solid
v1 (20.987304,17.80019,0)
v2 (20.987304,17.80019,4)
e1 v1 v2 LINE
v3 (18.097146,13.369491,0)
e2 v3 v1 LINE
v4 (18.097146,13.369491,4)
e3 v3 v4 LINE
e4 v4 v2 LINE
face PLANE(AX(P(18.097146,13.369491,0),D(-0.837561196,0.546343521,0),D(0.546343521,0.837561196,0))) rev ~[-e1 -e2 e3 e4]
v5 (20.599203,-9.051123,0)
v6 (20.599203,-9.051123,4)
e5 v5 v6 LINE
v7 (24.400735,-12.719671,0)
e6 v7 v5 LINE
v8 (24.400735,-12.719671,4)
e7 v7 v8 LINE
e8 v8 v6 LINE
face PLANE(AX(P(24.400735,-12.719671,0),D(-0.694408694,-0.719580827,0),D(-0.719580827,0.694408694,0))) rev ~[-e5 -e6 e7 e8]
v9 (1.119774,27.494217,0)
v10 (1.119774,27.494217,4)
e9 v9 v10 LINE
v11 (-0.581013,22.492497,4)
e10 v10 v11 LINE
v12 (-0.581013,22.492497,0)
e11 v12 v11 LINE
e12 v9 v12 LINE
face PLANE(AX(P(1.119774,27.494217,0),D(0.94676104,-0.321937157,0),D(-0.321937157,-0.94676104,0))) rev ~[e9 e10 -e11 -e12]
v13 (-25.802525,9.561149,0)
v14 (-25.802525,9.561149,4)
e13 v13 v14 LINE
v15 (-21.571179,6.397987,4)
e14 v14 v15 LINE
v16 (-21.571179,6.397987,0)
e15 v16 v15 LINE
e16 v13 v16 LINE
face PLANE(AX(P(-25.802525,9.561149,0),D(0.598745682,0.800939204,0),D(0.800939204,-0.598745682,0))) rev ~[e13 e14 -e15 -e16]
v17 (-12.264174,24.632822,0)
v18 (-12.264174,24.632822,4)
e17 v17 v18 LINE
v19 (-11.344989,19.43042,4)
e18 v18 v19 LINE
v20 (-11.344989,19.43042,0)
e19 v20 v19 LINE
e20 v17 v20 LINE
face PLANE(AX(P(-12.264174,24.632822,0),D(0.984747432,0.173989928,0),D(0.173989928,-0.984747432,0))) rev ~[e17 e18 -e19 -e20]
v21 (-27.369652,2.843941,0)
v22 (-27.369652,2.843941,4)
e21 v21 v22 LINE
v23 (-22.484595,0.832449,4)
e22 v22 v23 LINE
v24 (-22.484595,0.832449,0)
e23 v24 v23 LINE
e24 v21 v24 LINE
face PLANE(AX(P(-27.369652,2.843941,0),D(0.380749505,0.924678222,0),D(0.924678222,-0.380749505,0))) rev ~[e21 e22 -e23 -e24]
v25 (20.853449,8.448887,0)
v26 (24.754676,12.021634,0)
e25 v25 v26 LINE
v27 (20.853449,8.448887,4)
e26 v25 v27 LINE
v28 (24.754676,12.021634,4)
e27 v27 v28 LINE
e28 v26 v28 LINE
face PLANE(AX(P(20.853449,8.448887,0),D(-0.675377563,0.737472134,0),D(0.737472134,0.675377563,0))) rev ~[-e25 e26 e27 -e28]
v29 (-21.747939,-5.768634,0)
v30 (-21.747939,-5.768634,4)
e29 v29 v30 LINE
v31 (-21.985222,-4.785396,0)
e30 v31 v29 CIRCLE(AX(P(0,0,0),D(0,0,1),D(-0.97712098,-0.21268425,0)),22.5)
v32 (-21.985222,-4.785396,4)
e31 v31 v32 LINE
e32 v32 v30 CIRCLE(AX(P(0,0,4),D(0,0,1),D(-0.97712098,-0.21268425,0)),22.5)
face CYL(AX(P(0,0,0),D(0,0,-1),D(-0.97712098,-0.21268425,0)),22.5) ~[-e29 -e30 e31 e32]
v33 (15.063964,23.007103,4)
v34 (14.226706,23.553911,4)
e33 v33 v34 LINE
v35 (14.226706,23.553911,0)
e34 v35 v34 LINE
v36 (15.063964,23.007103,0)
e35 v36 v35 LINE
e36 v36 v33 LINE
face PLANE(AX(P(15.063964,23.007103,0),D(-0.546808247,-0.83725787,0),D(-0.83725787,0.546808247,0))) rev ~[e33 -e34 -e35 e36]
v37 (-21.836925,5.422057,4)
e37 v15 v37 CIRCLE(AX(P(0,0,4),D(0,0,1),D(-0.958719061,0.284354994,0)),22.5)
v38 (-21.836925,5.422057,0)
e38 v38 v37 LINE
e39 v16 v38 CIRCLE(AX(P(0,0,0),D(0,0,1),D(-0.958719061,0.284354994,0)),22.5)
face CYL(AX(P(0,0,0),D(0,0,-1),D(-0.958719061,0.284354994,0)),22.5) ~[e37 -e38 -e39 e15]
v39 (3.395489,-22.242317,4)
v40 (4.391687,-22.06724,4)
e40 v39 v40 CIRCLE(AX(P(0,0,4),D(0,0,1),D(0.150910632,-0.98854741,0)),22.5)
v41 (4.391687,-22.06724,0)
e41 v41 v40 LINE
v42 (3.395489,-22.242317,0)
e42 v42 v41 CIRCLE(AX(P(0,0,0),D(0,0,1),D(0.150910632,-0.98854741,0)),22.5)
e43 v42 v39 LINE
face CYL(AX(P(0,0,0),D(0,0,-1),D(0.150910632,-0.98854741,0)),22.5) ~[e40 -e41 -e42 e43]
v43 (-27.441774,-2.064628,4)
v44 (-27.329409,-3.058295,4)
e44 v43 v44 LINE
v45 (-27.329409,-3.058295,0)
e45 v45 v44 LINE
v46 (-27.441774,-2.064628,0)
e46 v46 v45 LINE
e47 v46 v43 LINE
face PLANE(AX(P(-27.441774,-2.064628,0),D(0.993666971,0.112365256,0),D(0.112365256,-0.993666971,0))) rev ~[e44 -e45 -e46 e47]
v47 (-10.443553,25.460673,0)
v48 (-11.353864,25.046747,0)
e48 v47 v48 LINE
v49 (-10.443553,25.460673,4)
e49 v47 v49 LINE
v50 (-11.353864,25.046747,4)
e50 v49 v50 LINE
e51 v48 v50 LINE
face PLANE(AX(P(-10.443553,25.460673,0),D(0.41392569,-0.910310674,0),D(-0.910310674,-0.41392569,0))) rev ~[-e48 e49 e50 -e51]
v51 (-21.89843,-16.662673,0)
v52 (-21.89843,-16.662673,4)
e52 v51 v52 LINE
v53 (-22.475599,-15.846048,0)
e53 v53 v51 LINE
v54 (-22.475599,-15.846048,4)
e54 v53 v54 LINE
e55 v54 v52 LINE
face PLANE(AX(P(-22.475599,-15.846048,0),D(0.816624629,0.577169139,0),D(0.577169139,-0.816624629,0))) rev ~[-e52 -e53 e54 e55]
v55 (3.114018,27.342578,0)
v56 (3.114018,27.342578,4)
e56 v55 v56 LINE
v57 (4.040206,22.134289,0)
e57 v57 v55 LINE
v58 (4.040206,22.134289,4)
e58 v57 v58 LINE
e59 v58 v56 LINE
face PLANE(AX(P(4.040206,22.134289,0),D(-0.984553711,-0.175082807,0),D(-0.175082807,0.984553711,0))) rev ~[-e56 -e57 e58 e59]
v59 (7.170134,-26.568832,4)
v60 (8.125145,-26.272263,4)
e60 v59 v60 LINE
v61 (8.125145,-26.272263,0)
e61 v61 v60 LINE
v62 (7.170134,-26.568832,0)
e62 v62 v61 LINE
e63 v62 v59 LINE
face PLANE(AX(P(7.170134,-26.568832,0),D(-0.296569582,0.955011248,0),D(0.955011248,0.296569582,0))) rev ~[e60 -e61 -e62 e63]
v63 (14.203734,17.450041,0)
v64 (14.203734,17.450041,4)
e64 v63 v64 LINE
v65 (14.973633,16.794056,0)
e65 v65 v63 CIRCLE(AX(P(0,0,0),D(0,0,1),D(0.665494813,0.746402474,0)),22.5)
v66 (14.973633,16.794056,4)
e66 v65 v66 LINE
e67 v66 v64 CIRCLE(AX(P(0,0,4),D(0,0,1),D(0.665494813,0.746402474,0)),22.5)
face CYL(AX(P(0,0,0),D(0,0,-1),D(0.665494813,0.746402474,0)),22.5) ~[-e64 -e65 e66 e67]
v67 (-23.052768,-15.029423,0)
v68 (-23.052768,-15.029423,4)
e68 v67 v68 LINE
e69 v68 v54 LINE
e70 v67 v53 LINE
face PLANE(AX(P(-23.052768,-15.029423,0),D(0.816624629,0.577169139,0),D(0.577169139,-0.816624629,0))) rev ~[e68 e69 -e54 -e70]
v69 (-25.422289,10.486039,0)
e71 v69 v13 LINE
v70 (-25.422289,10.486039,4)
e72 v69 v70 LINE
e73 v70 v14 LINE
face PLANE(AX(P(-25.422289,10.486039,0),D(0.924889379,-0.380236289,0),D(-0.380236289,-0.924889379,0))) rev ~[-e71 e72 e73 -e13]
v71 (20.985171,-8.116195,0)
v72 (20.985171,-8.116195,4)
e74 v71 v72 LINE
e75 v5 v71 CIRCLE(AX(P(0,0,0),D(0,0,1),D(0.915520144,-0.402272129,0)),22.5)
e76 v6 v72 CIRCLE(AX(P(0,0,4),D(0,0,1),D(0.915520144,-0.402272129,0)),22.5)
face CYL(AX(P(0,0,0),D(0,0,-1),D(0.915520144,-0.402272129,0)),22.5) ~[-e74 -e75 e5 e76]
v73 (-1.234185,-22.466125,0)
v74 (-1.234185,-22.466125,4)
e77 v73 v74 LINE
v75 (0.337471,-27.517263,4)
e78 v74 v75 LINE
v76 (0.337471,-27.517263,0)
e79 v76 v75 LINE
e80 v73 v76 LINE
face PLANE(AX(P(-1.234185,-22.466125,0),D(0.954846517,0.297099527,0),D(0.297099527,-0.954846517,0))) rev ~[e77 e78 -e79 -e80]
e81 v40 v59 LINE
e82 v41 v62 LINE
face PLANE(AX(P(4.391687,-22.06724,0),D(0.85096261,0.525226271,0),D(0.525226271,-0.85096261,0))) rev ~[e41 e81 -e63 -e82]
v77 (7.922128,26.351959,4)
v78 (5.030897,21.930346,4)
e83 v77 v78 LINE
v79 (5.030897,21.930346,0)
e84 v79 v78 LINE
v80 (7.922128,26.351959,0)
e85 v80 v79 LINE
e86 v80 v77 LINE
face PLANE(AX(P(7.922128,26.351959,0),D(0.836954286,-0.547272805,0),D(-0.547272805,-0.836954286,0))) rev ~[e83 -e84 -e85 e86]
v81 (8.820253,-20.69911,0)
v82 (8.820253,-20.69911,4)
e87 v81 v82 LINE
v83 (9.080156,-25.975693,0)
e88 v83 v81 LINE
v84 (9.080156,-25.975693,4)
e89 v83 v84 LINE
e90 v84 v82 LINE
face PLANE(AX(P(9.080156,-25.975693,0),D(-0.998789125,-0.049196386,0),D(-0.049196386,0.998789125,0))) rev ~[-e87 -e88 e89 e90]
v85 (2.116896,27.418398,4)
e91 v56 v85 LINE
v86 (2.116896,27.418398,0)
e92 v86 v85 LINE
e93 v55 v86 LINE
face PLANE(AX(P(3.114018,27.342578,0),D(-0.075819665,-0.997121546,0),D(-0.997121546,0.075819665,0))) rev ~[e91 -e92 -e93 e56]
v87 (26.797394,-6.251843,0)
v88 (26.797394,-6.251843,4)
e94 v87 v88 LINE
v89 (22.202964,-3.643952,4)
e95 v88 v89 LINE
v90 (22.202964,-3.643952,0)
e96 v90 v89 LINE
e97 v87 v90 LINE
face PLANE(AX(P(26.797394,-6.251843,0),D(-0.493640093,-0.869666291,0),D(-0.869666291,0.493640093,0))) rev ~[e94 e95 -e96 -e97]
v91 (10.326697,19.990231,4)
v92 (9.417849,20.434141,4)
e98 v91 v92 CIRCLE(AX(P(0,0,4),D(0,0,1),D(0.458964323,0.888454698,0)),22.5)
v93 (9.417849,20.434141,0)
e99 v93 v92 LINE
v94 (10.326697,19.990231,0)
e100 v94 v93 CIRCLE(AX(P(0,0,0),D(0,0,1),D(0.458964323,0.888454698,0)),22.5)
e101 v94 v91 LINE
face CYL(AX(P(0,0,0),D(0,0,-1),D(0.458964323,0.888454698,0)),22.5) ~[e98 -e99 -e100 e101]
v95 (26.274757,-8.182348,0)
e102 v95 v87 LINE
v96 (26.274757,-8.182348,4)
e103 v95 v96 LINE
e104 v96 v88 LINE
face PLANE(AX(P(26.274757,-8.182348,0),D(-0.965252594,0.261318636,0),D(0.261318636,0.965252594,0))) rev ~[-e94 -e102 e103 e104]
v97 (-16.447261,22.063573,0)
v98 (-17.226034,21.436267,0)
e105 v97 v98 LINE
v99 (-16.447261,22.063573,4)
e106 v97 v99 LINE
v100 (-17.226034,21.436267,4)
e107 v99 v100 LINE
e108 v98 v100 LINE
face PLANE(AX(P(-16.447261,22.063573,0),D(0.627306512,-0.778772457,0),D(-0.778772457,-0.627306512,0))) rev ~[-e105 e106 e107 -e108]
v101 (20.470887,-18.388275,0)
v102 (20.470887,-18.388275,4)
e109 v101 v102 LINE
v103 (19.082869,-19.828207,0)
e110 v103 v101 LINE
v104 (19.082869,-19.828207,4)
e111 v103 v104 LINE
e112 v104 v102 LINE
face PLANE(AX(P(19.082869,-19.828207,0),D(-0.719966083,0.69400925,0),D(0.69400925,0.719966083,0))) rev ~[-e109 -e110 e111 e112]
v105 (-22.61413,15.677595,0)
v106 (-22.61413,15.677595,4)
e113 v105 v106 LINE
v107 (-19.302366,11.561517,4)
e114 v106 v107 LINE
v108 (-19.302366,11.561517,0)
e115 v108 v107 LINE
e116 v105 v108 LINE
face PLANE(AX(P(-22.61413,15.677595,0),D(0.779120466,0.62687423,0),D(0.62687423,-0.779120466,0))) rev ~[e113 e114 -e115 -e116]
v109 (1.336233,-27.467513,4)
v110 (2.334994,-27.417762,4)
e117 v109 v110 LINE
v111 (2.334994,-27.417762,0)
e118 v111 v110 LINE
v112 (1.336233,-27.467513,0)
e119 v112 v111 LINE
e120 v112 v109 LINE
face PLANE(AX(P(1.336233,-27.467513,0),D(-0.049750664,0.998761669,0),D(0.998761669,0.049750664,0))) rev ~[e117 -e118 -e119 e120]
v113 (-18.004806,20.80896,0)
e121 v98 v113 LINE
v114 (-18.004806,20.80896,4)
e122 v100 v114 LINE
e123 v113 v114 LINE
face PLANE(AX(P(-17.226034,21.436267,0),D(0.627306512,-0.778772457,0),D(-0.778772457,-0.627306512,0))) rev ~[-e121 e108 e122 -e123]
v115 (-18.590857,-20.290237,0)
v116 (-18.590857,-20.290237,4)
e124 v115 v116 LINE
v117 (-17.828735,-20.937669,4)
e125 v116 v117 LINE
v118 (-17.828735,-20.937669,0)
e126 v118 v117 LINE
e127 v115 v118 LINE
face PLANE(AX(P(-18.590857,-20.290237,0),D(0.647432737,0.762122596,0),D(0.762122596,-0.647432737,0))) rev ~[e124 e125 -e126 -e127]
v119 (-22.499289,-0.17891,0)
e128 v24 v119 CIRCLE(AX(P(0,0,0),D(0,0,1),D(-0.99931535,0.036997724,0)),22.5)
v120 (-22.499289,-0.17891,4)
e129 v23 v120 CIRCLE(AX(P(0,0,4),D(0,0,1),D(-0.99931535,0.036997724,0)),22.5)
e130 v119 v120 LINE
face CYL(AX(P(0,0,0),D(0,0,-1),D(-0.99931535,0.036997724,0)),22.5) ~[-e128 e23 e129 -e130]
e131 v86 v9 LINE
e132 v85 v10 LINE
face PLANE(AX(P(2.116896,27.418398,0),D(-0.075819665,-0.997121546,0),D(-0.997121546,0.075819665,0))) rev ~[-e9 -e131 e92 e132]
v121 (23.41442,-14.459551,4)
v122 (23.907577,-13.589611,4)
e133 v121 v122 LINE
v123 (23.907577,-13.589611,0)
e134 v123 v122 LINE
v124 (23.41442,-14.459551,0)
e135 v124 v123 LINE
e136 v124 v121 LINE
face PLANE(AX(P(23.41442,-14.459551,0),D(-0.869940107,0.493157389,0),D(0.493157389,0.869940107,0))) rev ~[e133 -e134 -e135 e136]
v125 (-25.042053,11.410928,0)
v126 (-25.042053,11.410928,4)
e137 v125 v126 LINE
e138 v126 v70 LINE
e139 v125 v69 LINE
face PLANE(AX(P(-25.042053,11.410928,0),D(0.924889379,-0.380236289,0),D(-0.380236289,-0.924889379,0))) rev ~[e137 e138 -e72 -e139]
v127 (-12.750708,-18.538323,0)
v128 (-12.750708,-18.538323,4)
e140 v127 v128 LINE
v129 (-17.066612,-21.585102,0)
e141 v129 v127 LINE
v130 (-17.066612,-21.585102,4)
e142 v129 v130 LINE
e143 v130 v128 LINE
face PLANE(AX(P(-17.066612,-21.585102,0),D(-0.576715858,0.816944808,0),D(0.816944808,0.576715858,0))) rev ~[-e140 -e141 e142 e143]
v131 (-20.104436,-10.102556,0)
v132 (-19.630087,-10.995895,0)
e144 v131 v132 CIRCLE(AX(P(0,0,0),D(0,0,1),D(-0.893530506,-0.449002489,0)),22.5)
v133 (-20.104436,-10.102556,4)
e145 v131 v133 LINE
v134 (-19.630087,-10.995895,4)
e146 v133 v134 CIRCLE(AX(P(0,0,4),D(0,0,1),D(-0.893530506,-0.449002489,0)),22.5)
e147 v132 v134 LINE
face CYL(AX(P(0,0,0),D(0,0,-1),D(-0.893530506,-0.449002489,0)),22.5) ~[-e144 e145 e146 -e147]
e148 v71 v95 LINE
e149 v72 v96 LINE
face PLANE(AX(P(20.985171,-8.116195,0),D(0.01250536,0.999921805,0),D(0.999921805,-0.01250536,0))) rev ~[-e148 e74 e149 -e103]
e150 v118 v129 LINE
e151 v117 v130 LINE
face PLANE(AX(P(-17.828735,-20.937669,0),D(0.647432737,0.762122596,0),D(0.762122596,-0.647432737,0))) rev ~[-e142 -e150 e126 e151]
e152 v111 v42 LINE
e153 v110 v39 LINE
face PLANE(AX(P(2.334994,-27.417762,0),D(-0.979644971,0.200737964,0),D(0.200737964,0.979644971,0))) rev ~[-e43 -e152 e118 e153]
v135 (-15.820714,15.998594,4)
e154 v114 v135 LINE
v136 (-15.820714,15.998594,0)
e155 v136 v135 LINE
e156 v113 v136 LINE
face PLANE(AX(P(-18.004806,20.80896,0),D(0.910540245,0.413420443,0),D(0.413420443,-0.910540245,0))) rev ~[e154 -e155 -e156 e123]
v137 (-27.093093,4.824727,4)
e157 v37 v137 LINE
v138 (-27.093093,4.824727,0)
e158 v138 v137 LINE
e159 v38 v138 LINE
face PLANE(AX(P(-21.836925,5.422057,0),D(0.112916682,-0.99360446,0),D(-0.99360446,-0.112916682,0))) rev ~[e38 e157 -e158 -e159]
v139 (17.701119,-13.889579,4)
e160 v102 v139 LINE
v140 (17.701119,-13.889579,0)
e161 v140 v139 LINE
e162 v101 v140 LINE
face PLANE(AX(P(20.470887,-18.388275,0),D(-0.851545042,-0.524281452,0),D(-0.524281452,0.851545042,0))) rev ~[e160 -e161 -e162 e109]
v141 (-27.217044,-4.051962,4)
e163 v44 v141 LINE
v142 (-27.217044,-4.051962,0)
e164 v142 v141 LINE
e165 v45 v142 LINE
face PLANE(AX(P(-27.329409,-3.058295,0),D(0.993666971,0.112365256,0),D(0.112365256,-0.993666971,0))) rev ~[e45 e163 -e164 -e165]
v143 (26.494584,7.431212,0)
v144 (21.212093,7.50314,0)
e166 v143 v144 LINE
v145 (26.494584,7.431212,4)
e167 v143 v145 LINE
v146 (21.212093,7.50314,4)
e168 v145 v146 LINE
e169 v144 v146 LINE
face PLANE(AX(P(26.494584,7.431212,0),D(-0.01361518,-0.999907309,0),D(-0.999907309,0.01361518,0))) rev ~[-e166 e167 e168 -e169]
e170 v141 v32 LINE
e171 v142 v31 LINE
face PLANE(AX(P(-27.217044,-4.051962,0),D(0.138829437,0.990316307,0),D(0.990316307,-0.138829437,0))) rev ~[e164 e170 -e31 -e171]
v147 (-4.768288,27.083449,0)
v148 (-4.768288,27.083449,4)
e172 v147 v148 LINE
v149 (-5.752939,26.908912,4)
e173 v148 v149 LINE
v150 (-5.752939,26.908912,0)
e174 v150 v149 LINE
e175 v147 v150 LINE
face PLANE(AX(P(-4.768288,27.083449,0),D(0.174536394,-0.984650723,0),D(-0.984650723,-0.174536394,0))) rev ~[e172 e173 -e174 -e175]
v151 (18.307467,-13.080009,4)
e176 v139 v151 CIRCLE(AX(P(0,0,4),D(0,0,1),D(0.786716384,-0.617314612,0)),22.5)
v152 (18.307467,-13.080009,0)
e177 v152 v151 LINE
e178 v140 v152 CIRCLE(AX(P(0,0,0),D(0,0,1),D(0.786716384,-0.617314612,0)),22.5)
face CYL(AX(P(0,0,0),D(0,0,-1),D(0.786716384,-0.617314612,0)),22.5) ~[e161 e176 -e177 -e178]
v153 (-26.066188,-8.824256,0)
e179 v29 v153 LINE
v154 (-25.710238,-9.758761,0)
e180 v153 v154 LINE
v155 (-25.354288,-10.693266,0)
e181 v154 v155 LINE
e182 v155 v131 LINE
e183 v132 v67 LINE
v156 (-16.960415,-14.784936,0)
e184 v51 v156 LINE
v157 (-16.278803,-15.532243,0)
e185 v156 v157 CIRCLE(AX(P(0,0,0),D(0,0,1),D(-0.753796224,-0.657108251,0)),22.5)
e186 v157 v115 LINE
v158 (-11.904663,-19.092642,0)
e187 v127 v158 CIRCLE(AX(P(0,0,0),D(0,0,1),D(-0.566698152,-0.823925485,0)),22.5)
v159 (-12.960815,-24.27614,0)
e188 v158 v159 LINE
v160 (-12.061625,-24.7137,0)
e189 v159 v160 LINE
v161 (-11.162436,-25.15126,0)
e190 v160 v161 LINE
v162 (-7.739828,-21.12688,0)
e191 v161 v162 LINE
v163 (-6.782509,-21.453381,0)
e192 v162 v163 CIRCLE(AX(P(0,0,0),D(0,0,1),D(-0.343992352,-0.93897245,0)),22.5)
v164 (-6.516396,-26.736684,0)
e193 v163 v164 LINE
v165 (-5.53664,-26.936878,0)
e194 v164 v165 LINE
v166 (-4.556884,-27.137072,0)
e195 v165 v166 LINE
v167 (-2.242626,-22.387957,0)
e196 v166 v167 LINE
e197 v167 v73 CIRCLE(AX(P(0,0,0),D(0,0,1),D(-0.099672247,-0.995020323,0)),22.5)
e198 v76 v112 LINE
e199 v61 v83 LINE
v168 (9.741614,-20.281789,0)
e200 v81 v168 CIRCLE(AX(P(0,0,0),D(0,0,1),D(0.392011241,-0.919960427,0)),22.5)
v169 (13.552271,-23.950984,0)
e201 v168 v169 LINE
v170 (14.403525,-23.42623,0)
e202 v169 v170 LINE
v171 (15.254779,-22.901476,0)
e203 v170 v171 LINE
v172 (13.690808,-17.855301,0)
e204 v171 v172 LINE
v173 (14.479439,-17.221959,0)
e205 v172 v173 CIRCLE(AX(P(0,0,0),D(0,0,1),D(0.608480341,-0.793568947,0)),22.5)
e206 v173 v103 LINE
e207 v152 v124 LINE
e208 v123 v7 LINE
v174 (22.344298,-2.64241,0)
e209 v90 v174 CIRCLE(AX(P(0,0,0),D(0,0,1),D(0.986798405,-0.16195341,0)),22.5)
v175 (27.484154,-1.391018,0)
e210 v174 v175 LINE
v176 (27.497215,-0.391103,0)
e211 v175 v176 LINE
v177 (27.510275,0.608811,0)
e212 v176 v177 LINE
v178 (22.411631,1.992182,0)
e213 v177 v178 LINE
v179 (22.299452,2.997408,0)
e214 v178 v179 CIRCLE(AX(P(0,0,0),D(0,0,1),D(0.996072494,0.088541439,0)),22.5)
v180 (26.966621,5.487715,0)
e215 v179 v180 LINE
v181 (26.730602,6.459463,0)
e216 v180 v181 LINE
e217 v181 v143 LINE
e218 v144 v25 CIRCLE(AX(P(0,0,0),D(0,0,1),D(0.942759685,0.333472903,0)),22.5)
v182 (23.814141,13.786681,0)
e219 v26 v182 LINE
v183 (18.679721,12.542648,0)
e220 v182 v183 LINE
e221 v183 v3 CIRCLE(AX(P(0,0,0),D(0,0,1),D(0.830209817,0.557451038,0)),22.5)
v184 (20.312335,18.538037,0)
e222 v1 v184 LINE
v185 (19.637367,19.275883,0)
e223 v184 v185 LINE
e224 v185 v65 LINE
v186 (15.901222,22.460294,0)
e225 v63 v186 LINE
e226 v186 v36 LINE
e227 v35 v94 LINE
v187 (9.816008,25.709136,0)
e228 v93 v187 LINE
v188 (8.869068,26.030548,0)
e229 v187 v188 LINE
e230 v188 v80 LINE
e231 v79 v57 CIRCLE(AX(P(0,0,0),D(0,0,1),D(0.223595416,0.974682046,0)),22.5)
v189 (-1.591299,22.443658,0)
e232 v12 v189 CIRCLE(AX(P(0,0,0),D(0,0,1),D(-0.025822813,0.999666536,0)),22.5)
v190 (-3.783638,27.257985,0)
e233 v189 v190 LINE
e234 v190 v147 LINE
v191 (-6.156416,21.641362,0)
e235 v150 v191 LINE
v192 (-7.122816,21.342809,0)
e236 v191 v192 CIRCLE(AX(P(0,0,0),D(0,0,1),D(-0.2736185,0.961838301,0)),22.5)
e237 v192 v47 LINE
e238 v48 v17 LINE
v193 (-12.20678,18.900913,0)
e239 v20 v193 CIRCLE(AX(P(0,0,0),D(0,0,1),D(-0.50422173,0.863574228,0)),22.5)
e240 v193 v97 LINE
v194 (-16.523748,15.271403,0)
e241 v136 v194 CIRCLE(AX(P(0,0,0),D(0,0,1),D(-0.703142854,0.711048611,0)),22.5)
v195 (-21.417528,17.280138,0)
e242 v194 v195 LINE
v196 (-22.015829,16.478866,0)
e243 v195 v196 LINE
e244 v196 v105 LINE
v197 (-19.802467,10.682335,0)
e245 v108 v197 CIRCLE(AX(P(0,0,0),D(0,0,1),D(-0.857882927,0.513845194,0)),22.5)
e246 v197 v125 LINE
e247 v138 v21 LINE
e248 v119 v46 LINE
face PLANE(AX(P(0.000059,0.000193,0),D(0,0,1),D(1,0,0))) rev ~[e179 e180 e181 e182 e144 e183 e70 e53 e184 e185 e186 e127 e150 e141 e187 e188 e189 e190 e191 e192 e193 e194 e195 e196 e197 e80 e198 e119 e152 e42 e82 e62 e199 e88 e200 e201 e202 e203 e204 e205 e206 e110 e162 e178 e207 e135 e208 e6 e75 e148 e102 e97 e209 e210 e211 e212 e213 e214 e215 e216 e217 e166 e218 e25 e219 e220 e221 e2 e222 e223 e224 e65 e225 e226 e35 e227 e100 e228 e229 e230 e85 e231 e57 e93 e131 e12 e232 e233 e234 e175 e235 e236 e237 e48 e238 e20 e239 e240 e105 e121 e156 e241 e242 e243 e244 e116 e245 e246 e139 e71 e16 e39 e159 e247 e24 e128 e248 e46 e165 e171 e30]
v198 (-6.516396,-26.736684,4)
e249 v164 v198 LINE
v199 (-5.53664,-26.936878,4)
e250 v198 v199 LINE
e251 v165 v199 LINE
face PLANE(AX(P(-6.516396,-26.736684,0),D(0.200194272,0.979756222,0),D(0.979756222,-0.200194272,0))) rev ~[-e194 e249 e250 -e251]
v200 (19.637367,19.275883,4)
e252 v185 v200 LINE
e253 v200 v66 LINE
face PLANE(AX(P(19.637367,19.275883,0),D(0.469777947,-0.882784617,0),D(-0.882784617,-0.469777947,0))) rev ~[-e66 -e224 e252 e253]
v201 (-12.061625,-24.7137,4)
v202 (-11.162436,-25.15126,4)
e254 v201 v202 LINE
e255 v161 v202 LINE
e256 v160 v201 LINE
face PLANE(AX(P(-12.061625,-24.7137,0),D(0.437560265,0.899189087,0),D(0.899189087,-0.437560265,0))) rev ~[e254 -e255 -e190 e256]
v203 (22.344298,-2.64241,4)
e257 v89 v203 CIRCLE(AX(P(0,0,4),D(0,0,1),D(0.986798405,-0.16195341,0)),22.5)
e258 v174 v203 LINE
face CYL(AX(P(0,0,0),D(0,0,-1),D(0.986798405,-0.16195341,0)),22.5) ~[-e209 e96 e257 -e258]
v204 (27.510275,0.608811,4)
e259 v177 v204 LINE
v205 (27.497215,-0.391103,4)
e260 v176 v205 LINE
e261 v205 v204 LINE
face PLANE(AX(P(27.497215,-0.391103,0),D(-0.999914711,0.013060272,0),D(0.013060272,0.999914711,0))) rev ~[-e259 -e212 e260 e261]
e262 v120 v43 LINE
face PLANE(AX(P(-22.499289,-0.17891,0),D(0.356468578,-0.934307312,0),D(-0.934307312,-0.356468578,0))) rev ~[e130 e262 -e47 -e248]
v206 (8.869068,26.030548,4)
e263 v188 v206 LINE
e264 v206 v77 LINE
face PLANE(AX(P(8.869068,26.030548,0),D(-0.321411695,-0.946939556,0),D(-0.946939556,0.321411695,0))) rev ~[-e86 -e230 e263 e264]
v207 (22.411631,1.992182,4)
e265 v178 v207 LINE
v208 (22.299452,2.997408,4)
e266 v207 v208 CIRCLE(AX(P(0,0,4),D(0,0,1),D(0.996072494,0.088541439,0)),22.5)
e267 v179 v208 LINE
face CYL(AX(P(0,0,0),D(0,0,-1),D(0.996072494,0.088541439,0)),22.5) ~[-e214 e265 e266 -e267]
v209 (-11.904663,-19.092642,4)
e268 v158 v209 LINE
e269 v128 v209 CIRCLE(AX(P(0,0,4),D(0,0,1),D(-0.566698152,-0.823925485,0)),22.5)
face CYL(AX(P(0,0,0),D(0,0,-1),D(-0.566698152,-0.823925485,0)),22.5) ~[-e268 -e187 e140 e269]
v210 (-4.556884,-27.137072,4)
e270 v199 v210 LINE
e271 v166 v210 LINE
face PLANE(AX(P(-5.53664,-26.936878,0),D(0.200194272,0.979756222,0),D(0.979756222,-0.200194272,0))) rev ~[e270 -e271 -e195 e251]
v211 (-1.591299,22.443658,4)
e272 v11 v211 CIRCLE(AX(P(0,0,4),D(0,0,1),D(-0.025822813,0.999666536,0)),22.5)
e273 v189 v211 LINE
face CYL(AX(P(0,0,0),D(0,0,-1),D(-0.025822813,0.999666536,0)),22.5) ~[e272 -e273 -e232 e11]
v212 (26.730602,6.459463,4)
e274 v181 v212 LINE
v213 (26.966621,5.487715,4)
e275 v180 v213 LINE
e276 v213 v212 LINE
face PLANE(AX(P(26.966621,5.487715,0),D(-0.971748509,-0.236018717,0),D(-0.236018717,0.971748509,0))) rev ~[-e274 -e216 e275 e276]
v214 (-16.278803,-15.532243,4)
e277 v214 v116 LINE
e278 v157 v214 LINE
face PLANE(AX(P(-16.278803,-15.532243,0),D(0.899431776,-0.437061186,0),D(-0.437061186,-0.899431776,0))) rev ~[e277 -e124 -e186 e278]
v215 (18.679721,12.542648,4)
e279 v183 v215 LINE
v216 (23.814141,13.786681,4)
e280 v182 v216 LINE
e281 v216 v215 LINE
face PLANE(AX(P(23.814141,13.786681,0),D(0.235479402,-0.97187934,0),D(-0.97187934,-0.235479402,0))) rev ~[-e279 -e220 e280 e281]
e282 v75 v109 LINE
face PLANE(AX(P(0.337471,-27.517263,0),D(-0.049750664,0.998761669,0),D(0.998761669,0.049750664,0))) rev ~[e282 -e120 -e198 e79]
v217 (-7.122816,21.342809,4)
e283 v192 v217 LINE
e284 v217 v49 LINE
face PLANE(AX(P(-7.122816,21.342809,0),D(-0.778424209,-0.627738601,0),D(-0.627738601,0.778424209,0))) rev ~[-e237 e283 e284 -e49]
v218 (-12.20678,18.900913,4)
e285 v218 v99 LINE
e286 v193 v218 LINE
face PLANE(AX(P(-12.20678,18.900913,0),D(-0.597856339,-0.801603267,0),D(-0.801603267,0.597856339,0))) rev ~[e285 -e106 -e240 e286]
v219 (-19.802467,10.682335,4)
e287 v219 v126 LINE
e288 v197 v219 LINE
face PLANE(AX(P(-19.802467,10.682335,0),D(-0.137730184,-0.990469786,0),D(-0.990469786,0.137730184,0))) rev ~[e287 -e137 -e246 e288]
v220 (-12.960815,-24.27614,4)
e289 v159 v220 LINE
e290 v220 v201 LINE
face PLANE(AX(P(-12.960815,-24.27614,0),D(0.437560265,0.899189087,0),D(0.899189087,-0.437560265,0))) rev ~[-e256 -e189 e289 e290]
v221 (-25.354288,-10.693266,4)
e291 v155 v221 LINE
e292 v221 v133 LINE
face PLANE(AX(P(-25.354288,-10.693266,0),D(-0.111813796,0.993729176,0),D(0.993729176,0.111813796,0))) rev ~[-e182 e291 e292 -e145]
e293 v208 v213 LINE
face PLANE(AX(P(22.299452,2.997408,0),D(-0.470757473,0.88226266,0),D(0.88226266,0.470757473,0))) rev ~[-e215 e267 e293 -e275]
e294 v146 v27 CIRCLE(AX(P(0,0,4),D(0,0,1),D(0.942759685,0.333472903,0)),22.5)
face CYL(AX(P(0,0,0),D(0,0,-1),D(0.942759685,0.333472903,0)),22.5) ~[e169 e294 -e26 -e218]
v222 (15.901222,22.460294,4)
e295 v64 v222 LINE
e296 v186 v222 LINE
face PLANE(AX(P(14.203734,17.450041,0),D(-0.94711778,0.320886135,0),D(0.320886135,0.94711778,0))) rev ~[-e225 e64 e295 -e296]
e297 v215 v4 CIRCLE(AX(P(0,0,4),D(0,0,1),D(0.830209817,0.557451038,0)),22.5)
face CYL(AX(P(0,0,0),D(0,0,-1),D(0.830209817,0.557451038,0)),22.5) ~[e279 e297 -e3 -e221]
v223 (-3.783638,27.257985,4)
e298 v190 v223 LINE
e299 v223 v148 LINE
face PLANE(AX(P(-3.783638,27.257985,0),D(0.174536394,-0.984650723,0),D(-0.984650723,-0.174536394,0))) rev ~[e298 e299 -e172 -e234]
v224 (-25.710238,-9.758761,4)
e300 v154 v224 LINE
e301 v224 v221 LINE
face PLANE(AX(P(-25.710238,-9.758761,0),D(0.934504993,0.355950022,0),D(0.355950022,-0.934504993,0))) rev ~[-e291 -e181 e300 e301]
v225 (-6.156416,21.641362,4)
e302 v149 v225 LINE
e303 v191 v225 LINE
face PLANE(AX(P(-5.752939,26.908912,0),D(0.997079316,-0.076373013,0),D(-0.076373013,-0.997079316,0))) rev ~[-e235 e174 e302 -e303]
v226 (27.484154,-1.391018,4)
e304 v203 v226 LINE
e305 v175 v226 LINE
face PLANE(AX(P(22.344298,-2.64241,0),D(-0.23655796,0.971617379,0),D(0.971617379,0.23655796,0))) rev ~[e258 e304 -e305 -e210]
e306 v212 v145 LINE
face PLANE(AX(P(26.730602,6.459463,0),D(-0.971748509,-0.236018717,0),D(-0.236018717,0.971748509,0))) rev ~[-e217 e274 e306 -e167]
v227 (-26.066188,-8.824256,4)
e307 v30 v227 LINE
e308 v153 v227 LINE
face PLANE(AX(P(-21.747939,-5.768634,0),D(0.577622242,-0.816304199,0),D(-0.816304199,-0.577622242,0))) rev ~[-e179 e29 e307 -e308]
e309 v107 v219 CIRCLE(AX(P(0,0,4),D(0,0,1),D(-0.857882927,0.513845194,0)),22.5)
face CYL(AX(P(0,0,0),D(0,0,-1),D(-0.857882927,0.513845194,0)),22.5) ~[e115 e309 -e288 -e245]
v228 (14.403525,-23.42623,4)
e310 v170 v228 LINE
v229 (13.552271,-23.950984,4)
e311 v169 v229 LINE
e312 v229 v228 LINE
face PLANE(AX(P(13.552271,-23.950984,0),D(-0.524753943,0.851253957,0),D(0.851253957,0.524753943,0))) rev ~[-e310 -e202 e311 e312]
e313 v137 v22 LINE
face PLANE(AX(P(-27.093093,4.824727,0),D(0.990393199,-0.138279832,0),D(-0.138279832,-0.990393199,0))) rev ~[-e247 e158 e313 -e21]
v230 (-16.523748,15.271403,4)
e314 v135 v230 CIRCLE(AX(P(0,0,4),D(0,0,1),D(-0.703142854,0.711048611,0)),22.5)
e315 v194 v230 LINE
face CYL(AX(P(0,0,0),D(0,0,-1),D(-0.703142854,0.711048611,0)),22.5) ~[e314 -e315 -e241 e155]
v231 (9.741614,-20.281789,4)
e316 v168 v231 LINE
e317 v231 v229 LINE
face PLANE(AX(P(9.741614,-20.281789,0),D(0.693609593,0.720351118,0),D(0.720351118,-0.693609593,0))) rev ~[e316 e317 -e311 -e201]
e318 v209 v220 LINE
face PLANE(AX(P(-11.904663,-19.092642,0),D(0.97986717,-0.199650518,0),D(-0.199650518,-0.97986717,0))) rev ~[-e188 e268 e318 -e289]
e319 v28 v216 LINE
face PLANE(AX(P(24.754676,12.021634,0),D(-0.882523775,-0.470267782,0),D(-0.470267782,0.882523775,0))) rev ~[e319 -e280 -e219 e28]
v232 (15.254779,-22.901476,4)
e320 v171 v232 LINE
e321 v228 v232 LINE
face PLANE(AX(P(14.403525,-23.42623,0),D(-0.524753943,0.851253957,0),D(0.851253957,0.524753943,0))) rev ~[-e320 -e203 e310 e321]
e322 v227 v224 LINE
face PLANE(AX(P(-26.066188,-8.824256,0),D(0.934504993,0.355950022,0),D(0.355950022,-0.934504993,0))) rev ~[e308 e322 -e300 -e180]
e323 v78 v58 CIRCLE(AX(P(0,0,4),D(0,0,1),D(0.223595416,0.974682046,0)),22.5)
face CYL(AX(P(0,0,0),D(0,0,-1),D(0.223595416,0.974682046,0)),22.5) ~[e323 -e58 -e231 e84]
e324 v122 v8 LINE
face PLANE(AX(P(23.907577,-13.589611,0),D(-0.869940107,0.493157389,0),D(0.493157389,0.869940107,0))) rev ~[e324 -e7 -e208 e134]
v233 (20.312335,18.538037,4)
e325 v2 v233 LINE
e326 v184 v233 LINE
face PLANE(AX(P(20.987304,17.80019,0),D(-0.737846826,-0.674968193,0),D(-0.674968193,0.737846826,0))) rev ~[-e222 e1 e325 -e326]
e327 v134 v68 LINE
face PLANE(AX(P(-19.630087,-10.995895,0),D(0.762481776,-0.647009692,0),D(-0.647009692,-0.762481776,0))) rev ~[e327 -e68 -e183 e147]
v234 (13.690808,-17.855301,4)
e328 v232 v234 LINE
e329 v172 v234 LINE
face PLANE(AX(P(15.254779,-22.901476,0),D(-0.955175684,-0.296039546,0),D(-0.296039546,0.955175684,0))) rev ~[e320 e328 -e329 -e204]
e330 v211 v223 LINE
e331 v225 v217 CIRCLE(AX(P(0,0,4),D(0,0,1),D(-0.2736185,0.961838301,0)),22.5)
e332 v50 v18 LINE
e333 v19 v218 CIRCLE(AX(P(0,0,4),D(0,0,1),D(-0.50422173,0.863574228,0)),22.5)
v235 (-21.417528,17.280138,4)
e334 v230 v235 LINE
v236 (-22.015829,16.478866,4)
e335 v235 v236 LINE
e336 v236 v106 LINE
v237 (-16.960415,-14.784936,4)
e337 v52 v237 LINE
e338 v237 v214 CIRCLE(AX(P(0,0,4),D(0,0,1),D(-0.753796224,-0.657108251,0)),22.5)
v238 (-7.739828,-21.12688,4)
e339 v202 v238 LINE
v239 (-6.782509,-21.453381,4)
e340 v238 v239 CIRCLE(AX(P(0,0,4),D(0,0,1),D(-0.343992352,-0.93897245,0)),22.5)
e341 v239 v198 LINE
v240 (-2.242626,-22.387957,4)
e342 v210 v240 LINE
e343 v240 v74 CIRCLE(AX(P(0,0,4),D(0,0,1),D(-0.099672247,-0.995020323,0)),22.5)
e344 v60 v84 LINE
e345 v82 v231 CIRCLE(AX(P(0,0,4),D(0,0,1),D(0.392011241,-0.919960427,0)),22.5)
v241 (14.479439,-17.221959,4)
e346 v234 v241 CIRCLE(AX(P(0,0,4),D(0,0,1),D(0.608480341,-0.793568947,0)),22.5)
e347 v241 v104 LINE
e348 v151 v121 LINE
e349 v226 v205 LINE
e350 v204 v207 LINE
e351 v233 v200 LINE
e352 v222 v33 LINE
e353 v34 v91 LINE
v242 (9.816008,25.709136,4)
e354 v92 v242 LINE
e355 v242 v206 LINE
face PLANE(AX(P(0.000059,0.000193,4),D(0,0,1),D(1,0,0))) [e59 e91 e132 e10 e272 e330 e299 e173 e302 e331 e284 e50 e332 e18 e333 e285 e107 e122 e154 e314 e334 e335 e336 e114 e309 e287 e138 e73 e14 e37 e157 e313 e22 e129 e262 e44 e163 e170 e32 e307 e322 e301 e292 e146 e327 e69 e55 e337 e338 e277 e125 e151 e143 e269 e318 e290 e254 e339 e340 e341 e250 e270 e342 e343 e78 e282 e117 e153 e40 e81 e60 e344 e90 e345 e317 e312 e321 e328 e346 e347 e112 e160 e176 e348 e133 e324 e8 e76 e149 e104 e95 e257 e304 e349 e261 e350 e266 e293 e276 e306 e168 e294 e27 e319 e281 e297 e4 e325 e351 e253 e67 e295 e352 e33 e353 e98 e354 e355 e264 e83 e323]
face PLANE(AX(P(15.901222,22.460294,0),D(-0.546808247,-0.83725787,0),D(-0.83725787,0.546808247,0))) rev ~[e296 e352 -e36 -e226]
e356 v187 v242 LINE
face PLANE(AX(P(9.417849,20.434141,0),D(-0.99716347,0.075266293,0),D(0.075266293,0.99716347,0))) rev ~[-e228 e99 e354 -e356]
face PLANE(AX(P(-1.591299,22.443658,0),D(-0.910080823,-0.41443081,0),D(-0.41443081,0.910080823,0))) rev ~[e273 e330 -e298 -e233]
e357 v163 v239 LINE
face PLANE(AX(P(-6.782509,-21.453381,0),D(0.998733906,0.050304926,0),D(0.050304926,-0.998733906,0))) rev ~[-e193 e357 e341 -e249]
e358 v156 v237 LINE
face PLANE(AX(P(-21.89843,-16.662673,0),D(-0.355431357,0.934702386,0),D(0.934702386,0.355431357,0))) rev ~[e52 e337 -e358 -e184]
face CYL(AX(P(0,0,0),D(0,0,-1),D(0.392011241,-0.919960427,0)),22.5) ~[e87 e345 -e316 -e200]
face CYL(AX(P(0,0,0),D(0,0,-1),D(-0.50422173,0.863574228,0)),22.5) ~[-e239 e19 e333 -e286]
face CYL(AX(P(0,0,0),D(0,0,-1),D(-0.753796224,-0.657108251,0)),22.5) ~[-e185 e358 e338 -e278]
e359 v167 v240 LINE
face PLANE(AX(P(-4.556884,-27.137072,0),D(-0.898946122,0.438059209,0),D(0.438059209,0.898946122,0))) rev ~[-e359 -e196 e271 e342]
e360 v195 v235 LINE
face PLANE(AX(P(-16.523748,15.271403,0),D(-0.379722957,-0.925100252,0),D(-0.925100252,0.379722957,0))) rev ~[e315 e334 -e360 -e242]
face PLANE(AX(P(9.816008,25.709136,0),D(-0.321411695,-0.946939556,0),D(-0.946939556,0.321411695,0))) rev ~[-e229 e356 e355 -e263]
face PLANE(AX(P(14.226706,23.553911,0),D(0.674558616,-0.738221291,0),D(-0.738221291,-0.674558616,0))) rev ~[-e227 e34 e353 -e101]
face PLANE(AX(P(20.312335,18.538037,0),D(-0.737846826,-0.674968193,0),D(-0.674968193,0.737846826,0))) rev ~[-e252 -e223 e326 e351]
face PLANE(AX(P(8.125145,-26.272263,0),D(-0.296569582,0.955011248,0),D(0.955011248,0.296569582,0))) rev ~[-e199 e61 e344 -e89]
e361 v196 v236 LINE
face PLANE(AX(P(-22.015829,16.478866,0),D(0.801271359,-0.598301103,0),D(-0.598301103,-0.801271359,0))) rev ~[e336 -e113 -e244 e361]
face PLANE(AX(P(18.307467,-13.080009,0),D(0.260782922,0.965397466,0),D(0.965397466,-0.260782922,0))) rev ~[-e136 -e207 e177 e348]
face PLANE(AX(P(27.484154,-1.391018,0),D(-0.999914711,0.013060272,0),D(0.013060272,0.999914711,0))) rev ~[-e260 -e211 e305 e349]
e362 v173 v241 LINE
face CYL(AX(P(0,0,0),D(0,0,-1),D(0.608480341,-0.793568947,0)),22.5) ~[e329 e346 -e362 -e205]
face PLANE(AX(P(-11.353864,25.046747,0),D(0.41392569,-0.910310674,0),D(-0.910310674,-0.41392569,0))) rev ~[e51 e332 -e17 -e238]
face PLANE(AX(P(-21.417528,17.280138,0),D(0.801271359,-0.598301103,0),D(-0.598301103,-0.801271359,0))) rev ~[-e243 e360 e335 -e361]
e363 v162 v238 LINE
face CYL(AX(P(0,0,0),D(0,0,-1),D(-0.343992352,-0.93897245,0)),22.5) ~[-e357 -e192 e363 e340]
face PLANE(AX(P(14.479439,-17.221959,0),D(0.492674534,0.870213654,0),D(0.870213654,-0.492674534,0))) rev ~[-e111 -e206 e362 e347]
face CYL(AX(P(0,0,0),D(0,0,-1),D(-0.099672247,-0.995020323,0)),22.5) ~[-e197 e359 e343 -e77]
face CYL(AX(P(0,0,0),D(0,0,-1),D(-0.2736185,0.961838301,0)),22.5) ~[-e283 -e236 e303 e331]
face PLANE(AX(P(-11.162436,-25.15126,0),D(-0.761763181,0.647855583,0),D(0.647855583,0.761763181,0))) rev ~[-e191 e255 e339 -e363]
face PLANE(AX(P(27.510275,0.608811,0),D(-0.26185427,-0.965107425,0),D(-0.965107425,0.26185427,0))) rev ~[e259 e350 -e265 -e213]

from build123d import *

# Parameters (mm, degrees)
F1_DEPTH = 4


# Not quite as in the source:
# - a feature names something its author has since deleted; it is built from what else it names


with BuildPart() as f1:
    # F0 (on Top) → F1 (new body)
    with BuildSketch(Plane.XY):
        with BuildLine():
            ThreePointArc((-15.8207142224, 15.9985937349), (-16.1763177404, 15.6389495927), (-16.5237476958, 15.2714034091))
            ThreePointArc((-16.5237476958, 15.2714034091), (-17.2896362976, 14.3985581465), (-18.0094723367, 13.4873609781))
            ThreePointArc((-18.0094723367, 13.4873609781), (-18.6807530995, 12.5411109411), (-19.3023658635, 11.5615168585))
            ThreePointArc((-19.3023658635, 11.5615168585), (-19.557357582, 11.1247365996), (-19.8024673676, 10.6823352389))
            ThreePointArc((-19.8024673676, 10.6823352389), (-20.7974411865, 8.585827863), (-21.5711788684, 6.3979873576))
            ThreePointArc((-21.5711788684, 6.3979873576), (-21.7095367198, 5.9115154921), (-21.8369251863, 5.4220566587))
            ThreePointArc((-21.8369251863, 5.4220566587), (-22.2792598903, 3.1439749905), (-22.4845953717, 0.8324487809))
            ThreePointArc((-22.4845953717, 0.8324487809), (-22.4976258234, 0.3268521252), (-22.4992886849, -0.1789096823))
            ThreePointArc((-22.4992886849, -0.1789096823), (-22.3611907578, -2.4954253934), (-21.9852220552, -4.7853956142))
            ThreePointArc((-21.9852220552, -4.7853956142), (-21.872106356, -5.2783485629), (-21.7479391288, -5.76863447))
            ThreePointArc((-21.7479391288, -5.76863447), (-21.0380857712, -7.9780290224), (-20.104436381, -10.1025560035))
            ThreePointArc((-20.104436381, -10.1025560035), (-19.8722820063, -10.5518911983), (-19.630086574, -10.9958947383))
            ThreePointArc((-19.630086574, -10.9958947383), (-18.393080483, -12.9593437467), (-16.96041503, -14.7849356444))
            ThreePointArc((-16.96041503, -14.7849356444), (-16.623809093, -15.1624197026), (-16.2788034853, -15.5322425002))
            ThreePointArc((-16.2788034853, -15.5322425002), (-14.5923703031, -17.1263752422), (-12.7507084267, -18.5383234036))
            ThreePointArc((-12.7507084267, -18.5383234036), (-12.3308011164, -18.8202376135), (-11.9046633044, -19.0926423422))
            ThreePointArc((-11.9046633044, -19.0926423422), (-9.87476783, -20.2172935949), (-7.7398279191, -21.1268801242))
            ThreePointArc((-7.7398279191, -21.1268801242), (-7.263003556, -21.2955107792), (-6.7825093458, -21.4533812481))
            ThreePointArc((-6.7825093458, -21.4533812481), (-4.5366973773, -22.0378850371), (-2.2426255582, -22.3879572674))
            ThreePointArc((-2.2426255582, -22.3879572674), (-1.7388447708, -22.4327086832), (-1.2341853806, -22.46612531))
            ThreePointArc((-1.2341853806, -22.46612531), (1.0864304565, -22.4737551126), (3.3954892143, -22.2423167183))
            ThreePointArc((3.3954892143, -22.2423167183), (3.8945720264, -22.1603769988), (4.391686991, -22.0672400942))
            ThreePointArc((4.391686991, -22.0672400942), (6.641293869, -21.4975165018), (8.8202529117, -20.6991096082))
            ThreePointArc((8.8202529117, -20.6991096082), (9.28327854, -20.4956273275), (9.7416135175, -20.2817890255))
            ThreePointArc((9.7416135175, -20.2817890255), (11.7788603628, -19.1705098668), (13.69080768, -17.8553013155))
            ThreePointArc((13.69080768, -17.8553013155), (14.0886825213, -17.5430620136), (14.4794386395, -17.2219585612))
            ThreePointArc((14.4794386395, -17.2219585612), (16.1763177404, -15.6389495927), (17.7011186506, -13.8895787739))
            ThreePointArc((17.7011186506, -13.8895787739), (18.0088427653, -13.4882015945), (18.3074673802, -13.0800091026))
            ThreePointArc((18.3074673802, -13.0800091026), (19.557357582, -11.1247365996), (20.5992032362, -9.0511229157))
            ThreePointArc((20.5992032362, -9.0511229157), (20.7974411865, -8.585827863), (20.9851706152, -8.1161945671))
            ThreePointArc((20.9851706152, -8.1161945671), (21.7095367198, -5.9115154921), (22.2029641238, -3.643951717))
            ThreePointArc((22.2029641238, -3.643951717), (22.2792598903, -3.1439749905), (22.3442984024, -2.6424096777))
            ThreePointArc((22.3442984024, -2.6424096777), (22.4610408714, -1.3234964953), (22.5, 0))
            ThreePointArc((22.5, 0), (22.4778969231, 0.9970706661), (22.4116311188, 1.9921823697))
            ThreePointArc((22.4116311188, 1.9921823697), (22.3611907578, 2.4954253934), (22.2994517444, 2.9974075298))
            ThreePointArc((22.2994517444, 2.9974075298), (21.872106356, 5.2783485629), (21.2120929064, 7.5031403113))
            ThreePointArc((21.2120929064, 7.5031403113), (21.0380857712, 7.9780290224), (20.8534485216, 8.4488865986))
            ThreePointArc((20.8534485216, 8.4488865986), (19.8722820063, 10.5518911983), (18.679720884, 12.5426483525))
            ThreePointArc((18.679720884, 12.5426483525), (18.393080483, 12.9593437467), (18.0971464347, 13.3694910495))
            ThreePointArc((18.0971464347, 13.3694910495), (16.623809093, 15.1624197026), (14.9736332993, 16.7940556691))
            ThreePointArc((14.9736332993, 16.7940556691), (14.5923703031, 17.1263752422), (14.2037340805, 17.4500412082))
            ThreePointArc((14.2037340805, 17.4500412082), (12.3308011164, 18.8202376135), (10.3266972653, 19.9902307038))
            ThreePointArc((10.3266972653, 19.9902307038), (9.87476783, 20.2172935949), (9.4178488765, 20.4341411011))
            ThreePointArc((9.4178488765, 20.4341411011), (7.263003556, 21.2955107792), (5.0308968631, 21.9303460245))
            ThreePointArc((5.0308968631, 21.9303460245), (4.5366973773, 22.0378850371), (4.0402055911, 22.1342887571))
            ThreePointArc((4.0402055911, 22.1342887571), (1.7388447708, 22.4327086832), (-0.5810132914, 22.4924970502))
            ThreePointArc((-0.5810132914, 22.4924970502), (-1.0864304565, 22.4737551126), (-1.5912986705, 22.4436576462))
            ThreePointArc((-1.5912986705, 22.4436576462), (-3.8945720264, 22.1603769988), (-6.1564162439, 21.6413617647))
            ThreePointArc((-6.1564162439, 21.6413617647), (-6.641293869, 21.4975165018), (-7.1228157842, 21.3428089835))
            ThreePointArc((-7.1228157842, 21.3428089835), (-9.28327854, 20.4956273275), (-11.3449889221, 19.4304201282))
            ThreePointArc((-11.3449889221, 19.4304201282), (-11.7788603628, 19.1705098668), (-12.2067801862, 18.9009131389))
            ThreePointArc((-12.2067801862, 18.9009131389), (-14.0886825213, 17.5430620136), (-15.8207142224, 15.9985937349))
        make_face()
        with BuildLine():
            ThreePointArc((-18.0094723367, 13.4873609781), (-17.2896362976, 14.3985581465), (-16.5237476958, 15.2714034091))
            Line((-16.5237476958, 15.2714034091), (-21.4175280286, 17.2801378501))
            Line((-21.4175280286, 17.2801378501), (-22.0158291312, 16.4788664912))
            Line((-22.0158291312, 16.4788664912), (-18.0094723367, 13.4873609781))
        make_face()
        with BuildLine():
            ThreePointArc((-19.3023658635, 11.5615168585), (-18.6807530995, 12.5411109411), (-18.0094723367, 13.4873609781))
            Line((-18.0094723367, 13.4873609781), (-22.0158291312, 16.4788664912))
            Line((-22.0158291312, 16.4788664912), (-22.6141302339, 15.6775951323))
            Line((-22.6141302339, 15.6775951323), (-19.3023658635, 11.5615168585))
        make_face()
        with BuildLine():
            Line((-18.0048063836, 20.8089601483), (-15.8207142224, 15.9985937349))
            ThreePointArc((-15.8207142224, 15.9985937349), (-14.0886825213, 17.5430620136), (-12.2067801862, 18.9009131389))
            Line((-12.2067801862, 18.9009131389), (-16.4472614694, 22.0635731724))
            Line((-16.4472614694, 22.0635731724), (-17.2260339265, 21.4362666603))
            Line((-17.2260339265, 21.4362666603), (-18.0048063836, 20.8089601483))
        make_face()
        with BuildLine():
            ThreePointArc((-21.5711788684, 6.3979873576), (-20.7974411865, 8.585827863), (-19.8024673676, 10.6823352389))
            Line((-19.8024673676, 10.6823352389), (-25.0420525337, 11.4109279148))
            Line((-25.0420525337, 11.4109279148), (-25.4222888231, 10.4860385354))
            Line((-25.4222888231, 10.4860385354), (-25.8025251126, 9.5611491559))
            Line((-25.8025251126, 9.5611491559), (-21.5711788684, 6.3979873576))
        make_face()
        with BuildLine():
            Line((-12.2641743313, 24.6328216682), (-11.3449889221, 19.4304201282))
            ThreePointArc((-11.3449889221, 19.4304201282), (-9.28327854, 20.4956273275), (-7.1228157842, 21.3428089835))
            Line((-7.1228157842, 21.3428089835), (-10.4435529833, 25.4606730481))
            Line((-10.4435529833, 25.4606730481), (-11.3538636573, 25.0467473581))
            Line((-11.3538636573, 25.0467473581), (-12.2641743313, 24.6328216682))
        make_face()
        with BuildLine():
            ThreePointArc((-22.4845953717, 0.8324487809), (-22.2792598903, 3.1439749905), (-21.8369251863, 5.4220566587))
            Line((-21.8369251863, 5.4220566587), (-27.0930927798, 4.8247274121))
            Line((-27.0930927798, 4.8247274121), (-27.2313726116, 3.8343342134))
            Line((-27.2313726116, 3.8343342134), (-27.3696524434, 2.8439410147))
            Line((-27.3696524434, 2.8439410147), (-22.4845953717, 0.8324487809))
        make_face()
        with BuildLine():
            Line((-5.7529391012, 26.9089124095), (-6.1564162439, 21.6413617647))
            ThreePointArc((-6.1564162439, 21.6413617647), (-3.8945720264, 22.1603769988), (-1.5912986705, 22.4436576462))
            Line((-1.5912986705, 22.4436576462), (-3.7836376545, 27.2579851984))
            Line((-3.7836376545, 27.2579851984), (-4.7682883778, 27.083448804))
            Line((-4.7682883778, 27.083448804), (-5.7529391012, 26.9089124095))
        make_face()
        with BuildLine():
            ThreePointArc((-21.9852220552, -4.7853956142), (-22.3611907578, -2.4954253934), (-22.4992886849, -0.1789096823))
            Line((-22.4992886849, -0.1789096823), (-27.4417743651, -2.0646284579))
            Line((-27.4417743651, -2.0646284579), (-27.3294091089, -3.0582954289))
            Line((-27.3294091089, -3.0582954289), (-27.2170438526, -4.0519623998))
            Line((-27.2170438526, -4.0519623998), (-21.9852220552, -4.7853956142))
        make_face()
        with BuildLine():
            Line((1.1197744504, 27.4942172201), (-0.5810132914, 22.4924970502))
            ThreePointArc((-0.5810132914, 22.4924970502), (1.7388447708, 22.4327086832), (4.0402055911, 22.1342887571))
            Line((4.0402055911, 22.1342887571), (3.1140175434, 27.3425778908))
            Line((3.1140175434, 27.3425778908), (2.1168959969, 27.4183975554))
            Line((2.1168959969, 27.4183975554), (1.1197744504, 27.4942172201))
        make_face()
        with BuildLine():
            ThreePointArc((-20.104436381, -10.1025560035), (-21.0380857712, -7.9780290224), (-21.7479391288, -5.76863447))
            Line((-21.7479391288, -5.76863447), (-26.0661883433, -8.8242561288))
            Line((-26.0661883433, -8.8242561288), (-25.7102383213, -9.7587611217))
            Line((-25.7102383213, -9.7587611217), (-25.3542882993, -10.6932661147))
            Line((-25.3542882993, -10.6932661147), (-20.104436381, -10.1025560035))
        make_face()
        with BuildLine():
            Line((7.9221284551, 26.3519592461), (5.0308968631, 21.9303460245))
            ThreePointArc((5.0308968631, 21.9303460245), (7.263003556, 21.2955107792), (9.4178488765, 20.4341411011))
            Line((9.4178488765, 20.4341411011), (9.8160075665, 25.7091358554))
            Line((9.8160075665, 25.7091358554), (8.8690680108, 26.0305475507))
            Line((8.8690680108, 26.0305475507), (7.9221284551, 26.3519592461))
        make_face()
        with BuildLine():
            ThreePointArc((-16.96041503, -14.7849356444), (-18.393080483, -12.9593437467), (-19.630086574, -10.9958947383))
            Line((-19.630086574, -10.9958947383), (-23.0527678432, -15.0294233337))
            Line((-23.0527678432, -15.0294233337), (-22.4755987044, -15.8460479631))
            Line((-22.4755987044, -15.8460479631), (-21.8984295657, -16.6626725925))
            Line((-21.8984295657, -16.6626725925), (-16.96041503, -14.7849356444))
        make_face()
        with BuildLine():
            Line((14.2267059934, 23.5539107569), (10.3266972653, 19.9902307038))
            ThreePointArc((10.3266972653, 19.9902307038), (12.3308011164, 18.8202376135), (14.2037340805, 17.4500412082))
            Line((14.2037340805, 17.4500412082), (15.9012217334, 22.4602942626))
            Line((15.9012217334, 22.4602942626), (15.0639638634, 23.0071025097))
            Line((15.0639638634, 23.0071025097), (14.2267059934, 23.5539107569))
        make_face()
        with BuildLine():
            ThreePointArc((-12.7507084267, -18.5383234036), (-14.5923703031, -17.1263752422), (-16.2788034853, -15.5322425002))
            Line((-16.2788034853, -15.5322425002), (-18.5908571573, -20.2902365963))
            Line((-18.5908571573, -20.2902365963), (-17.8287345614, -20.9376693333))
            Line((-17.8287345614, -20.9376693333), (-17.0666119656, -21.5851020702))
            Line((-17.0666119656, -21.5851020702), (-12.7507084267, -18.5383234036))
        make_face()
        with BuildLine():
            Line((19.637367272, 19.2758834296), (14.9736332993, 16.7940556691))
            ThreePointArc((14.9736332993, 16.7940556691), (16.623809093, 15.1624197026), (18.0971464347, 13.3694910495))
            Line((18.0971464347, 13.3694910495), (20.9873036582, 17.8001897781))
            Line((20.9873036582, 17.8001897781), (20.3123354651, 18.5380366038))
            Line((20.3123354651, 18.5380366038), (19.637367272, 19.2758834296))
        make_face()
        with BuildLine():
            ThreePointArc((-7.7398279191, -21.1268801242), (-9.87476783, -20.2172935949), (-11.9046633044, -19.0926423422))
            Line((-11.9046633044, -19.0926423422), (-12.9608145438, -24.2761396712))
            Line((-12.9608145438, -24.2761396712), (-12.0616254564, -24.7136999358))
            Line((-12.0616254564, -24.7136999358), (-11.1624363691, -25.1512602005))
            Line((-11.1624363691, -25.1512602005), (-7.7398279191, -21.1268801242))
        make_face()
        with BuildLine():
            Line((23.8141405436, 13.7866814547), (18.679720884, 12.5426483525))
            ThreePointArc((18.679720884, 12.5426483525), (19.8722820063, 10.5518911983), (20.8534485216, 8.4488865986))
            Line((20.8534485216, 8.4488865986), (24.7546761082, 12.0216339053))
            Line((24.7546761082, 12.0216339053), (24.2844083259, 12.90415768))
            Line((24.2844083259, 12.90415768), (23.8141405436, 13.7866814547))
        make_face()
        with BuildLine():
            ThreePointArc((-2.2426255582, -22.3879572674), (-4.5366973773, -22.0378850371), (-6.7825093458, -21.4533812481))
            Line((-6.7825093458, -21.4533812481), (-6.516396286, -26.7366836092))
            Line((-6.516396286, -26.7366836092), (-5.5366400645, -26.9368778808))
            Line((-5.5366400645, -26.9368778808), (-4.556883843, -27.1370721525))
            Line((-4.556883843, -27.1370721525), (-2.2426255582, -22.3879572674))
        make_face()
        with BuildLine():
            Line((26.4945837827, 7.4312115802), (21.2120929064, 7.5031403113))
            ThreePointArc((21.2120929064, 7.5031403113), (21.872106356, 5.2783485629), (22.2994517444, 2.9974075298))
            Line((22.2994517444, 2.9974075298), (26.966621217, 5.4877145618))
            Line((26.966621217, 5.4877145618), (26.7306024999, 6.459463071))
            Line((26.7306024999, 6.459463071), (26.4945837827, 7.4312115802))
        make_face()
        with BuildLine():
            ThreePointArc((3.3954892143, -22.2423167183), (1.0864304565, -22.4737551126), (-1.2341853806, -22.46612531))
            Line((-1.2341853806, -22.46612531), (0.3374711161, -27.5172633854))
            Line((0.3374711161, -27.5172633854), (1.3362327851, -27.4675127217))
            Line((1.3362327851, -27.4675127217), (2.3349944541, -27.4177620579))
            Line((2.3349944541, -27.4177620579), (3.3954892143, -22.2423167183))
        make_face()
        with BuildLine():
            Line((27.5102748824, 0.608811352), (22.4116311188, 1.9921823697))
            ThreePointArc((22.4116311188, 1.9921823697), (22.4778969231, 0.9970706661), (22.5, 0))
            ThreePointArc((22.5, 0), (22.4610408714, -1.3234964953), (22.3442984024, -2.6424096777))
            Line((22.3442984024, -2.6424096777), (27.4841543385, -1.3910180701))
            Line((27.4841543385, -1.3910180701), (27.4972146104, -0.3911033591))
            Line((27.4972146104, -0.3911033591), (27.5102748824, 0.608811352))
        make_face()
        with BuildLine():
            ThreePointArc((8.8202529117, -20.6991096082), (6.641293869, -21.4975165018), (4.391686991, -22.0672400942))
            Line((4.391686991, -22.0672400942), (7.1701339668, -26.5688323017))
            Line((7.1701339668, -26.5688323017), (8.1251452144, -26.2722627197))
            Line((8.1251452144, -26.2722627197), (9.080156462, -25.9756931378))
            Line((9.080156462, -25.9756931378), (8.8202529117, -20.6991096082))
        make_face()
        with BuildLine():
            Line((26.7973942355, -6.2518427326), (22.2029641238, -3.643951717))
            ThreePointArc((22.2029641238, -3.643951717), (21.7095367198, -5.9115154921), (20.9851706152, -8.1161945671))
            Line((20.9851706152, -8.1161945671), (26.2747569633, -8.1823479208))
            Line((26.2747569633, -8.1823479208), (26.5360755994, -7.2170953267))
            Line((26.5360755994, -7.2170953267), (26.7973942355, -6.2518427326))
        make_face()
        with BuildLine():
            ThreePointArc((13.69080768, -17.8553013155), (11.7788603628, -19.1705098668), (9.7416135175, -20.2817890255))
            Line((9.7416135175, -20.2817890255), (13.5522709305, -23.9509837711))
            Line((13.5522709305, -23.9509837711), (14.4035248878, -23.4262298285))
            Line((14.4035248878, -23.4262298285), (15.254778845, -22.901475886))
            Line((15.254778845, -22.901475886), (13.69080768, -17.8553013155))
        make_face()
        with BuildLine():
            Line((24.4007347549, -12.7196705455), (20.5992032362, -9.0511229157))
            ThreePointArc((20.5992032362, -9.0511229157), (19.557357582, -11.1247365996), (18.3074673802, -13.0800091026))
            Line((18.3074673802, -13.0800091026), (23.4144199762, -14.459550759))
            Line((23.4144199762, -14.459550759), (23.9075773656, -13.5896106523))
            Line((23.9075773656, -13.5896106523), (24.4007347549, -12.7196705455))
        make_face()
        with BuildLine():
            ThreePointArc((17.7011186506, -13.8895787739), (16.1763177404, -15.6389495927), (14.4794386395, -17.2219585612))
            Line((14.4794386395, -17.2219585612), (19.0828688698, -19.8282068446))
            Line((19.0828688698, -19.8282068446), (19.7768781199, -19.1082407615))
            Line((19.7768781199, -19.1082407615), (20.47088737, -18.3882746784))
            Line((20.47088737, -18.3882746784), (17.7011186506, -13.8895787739))
        make_face()
    extrude(amount=F1_DEPTH)


solid = f1.part
